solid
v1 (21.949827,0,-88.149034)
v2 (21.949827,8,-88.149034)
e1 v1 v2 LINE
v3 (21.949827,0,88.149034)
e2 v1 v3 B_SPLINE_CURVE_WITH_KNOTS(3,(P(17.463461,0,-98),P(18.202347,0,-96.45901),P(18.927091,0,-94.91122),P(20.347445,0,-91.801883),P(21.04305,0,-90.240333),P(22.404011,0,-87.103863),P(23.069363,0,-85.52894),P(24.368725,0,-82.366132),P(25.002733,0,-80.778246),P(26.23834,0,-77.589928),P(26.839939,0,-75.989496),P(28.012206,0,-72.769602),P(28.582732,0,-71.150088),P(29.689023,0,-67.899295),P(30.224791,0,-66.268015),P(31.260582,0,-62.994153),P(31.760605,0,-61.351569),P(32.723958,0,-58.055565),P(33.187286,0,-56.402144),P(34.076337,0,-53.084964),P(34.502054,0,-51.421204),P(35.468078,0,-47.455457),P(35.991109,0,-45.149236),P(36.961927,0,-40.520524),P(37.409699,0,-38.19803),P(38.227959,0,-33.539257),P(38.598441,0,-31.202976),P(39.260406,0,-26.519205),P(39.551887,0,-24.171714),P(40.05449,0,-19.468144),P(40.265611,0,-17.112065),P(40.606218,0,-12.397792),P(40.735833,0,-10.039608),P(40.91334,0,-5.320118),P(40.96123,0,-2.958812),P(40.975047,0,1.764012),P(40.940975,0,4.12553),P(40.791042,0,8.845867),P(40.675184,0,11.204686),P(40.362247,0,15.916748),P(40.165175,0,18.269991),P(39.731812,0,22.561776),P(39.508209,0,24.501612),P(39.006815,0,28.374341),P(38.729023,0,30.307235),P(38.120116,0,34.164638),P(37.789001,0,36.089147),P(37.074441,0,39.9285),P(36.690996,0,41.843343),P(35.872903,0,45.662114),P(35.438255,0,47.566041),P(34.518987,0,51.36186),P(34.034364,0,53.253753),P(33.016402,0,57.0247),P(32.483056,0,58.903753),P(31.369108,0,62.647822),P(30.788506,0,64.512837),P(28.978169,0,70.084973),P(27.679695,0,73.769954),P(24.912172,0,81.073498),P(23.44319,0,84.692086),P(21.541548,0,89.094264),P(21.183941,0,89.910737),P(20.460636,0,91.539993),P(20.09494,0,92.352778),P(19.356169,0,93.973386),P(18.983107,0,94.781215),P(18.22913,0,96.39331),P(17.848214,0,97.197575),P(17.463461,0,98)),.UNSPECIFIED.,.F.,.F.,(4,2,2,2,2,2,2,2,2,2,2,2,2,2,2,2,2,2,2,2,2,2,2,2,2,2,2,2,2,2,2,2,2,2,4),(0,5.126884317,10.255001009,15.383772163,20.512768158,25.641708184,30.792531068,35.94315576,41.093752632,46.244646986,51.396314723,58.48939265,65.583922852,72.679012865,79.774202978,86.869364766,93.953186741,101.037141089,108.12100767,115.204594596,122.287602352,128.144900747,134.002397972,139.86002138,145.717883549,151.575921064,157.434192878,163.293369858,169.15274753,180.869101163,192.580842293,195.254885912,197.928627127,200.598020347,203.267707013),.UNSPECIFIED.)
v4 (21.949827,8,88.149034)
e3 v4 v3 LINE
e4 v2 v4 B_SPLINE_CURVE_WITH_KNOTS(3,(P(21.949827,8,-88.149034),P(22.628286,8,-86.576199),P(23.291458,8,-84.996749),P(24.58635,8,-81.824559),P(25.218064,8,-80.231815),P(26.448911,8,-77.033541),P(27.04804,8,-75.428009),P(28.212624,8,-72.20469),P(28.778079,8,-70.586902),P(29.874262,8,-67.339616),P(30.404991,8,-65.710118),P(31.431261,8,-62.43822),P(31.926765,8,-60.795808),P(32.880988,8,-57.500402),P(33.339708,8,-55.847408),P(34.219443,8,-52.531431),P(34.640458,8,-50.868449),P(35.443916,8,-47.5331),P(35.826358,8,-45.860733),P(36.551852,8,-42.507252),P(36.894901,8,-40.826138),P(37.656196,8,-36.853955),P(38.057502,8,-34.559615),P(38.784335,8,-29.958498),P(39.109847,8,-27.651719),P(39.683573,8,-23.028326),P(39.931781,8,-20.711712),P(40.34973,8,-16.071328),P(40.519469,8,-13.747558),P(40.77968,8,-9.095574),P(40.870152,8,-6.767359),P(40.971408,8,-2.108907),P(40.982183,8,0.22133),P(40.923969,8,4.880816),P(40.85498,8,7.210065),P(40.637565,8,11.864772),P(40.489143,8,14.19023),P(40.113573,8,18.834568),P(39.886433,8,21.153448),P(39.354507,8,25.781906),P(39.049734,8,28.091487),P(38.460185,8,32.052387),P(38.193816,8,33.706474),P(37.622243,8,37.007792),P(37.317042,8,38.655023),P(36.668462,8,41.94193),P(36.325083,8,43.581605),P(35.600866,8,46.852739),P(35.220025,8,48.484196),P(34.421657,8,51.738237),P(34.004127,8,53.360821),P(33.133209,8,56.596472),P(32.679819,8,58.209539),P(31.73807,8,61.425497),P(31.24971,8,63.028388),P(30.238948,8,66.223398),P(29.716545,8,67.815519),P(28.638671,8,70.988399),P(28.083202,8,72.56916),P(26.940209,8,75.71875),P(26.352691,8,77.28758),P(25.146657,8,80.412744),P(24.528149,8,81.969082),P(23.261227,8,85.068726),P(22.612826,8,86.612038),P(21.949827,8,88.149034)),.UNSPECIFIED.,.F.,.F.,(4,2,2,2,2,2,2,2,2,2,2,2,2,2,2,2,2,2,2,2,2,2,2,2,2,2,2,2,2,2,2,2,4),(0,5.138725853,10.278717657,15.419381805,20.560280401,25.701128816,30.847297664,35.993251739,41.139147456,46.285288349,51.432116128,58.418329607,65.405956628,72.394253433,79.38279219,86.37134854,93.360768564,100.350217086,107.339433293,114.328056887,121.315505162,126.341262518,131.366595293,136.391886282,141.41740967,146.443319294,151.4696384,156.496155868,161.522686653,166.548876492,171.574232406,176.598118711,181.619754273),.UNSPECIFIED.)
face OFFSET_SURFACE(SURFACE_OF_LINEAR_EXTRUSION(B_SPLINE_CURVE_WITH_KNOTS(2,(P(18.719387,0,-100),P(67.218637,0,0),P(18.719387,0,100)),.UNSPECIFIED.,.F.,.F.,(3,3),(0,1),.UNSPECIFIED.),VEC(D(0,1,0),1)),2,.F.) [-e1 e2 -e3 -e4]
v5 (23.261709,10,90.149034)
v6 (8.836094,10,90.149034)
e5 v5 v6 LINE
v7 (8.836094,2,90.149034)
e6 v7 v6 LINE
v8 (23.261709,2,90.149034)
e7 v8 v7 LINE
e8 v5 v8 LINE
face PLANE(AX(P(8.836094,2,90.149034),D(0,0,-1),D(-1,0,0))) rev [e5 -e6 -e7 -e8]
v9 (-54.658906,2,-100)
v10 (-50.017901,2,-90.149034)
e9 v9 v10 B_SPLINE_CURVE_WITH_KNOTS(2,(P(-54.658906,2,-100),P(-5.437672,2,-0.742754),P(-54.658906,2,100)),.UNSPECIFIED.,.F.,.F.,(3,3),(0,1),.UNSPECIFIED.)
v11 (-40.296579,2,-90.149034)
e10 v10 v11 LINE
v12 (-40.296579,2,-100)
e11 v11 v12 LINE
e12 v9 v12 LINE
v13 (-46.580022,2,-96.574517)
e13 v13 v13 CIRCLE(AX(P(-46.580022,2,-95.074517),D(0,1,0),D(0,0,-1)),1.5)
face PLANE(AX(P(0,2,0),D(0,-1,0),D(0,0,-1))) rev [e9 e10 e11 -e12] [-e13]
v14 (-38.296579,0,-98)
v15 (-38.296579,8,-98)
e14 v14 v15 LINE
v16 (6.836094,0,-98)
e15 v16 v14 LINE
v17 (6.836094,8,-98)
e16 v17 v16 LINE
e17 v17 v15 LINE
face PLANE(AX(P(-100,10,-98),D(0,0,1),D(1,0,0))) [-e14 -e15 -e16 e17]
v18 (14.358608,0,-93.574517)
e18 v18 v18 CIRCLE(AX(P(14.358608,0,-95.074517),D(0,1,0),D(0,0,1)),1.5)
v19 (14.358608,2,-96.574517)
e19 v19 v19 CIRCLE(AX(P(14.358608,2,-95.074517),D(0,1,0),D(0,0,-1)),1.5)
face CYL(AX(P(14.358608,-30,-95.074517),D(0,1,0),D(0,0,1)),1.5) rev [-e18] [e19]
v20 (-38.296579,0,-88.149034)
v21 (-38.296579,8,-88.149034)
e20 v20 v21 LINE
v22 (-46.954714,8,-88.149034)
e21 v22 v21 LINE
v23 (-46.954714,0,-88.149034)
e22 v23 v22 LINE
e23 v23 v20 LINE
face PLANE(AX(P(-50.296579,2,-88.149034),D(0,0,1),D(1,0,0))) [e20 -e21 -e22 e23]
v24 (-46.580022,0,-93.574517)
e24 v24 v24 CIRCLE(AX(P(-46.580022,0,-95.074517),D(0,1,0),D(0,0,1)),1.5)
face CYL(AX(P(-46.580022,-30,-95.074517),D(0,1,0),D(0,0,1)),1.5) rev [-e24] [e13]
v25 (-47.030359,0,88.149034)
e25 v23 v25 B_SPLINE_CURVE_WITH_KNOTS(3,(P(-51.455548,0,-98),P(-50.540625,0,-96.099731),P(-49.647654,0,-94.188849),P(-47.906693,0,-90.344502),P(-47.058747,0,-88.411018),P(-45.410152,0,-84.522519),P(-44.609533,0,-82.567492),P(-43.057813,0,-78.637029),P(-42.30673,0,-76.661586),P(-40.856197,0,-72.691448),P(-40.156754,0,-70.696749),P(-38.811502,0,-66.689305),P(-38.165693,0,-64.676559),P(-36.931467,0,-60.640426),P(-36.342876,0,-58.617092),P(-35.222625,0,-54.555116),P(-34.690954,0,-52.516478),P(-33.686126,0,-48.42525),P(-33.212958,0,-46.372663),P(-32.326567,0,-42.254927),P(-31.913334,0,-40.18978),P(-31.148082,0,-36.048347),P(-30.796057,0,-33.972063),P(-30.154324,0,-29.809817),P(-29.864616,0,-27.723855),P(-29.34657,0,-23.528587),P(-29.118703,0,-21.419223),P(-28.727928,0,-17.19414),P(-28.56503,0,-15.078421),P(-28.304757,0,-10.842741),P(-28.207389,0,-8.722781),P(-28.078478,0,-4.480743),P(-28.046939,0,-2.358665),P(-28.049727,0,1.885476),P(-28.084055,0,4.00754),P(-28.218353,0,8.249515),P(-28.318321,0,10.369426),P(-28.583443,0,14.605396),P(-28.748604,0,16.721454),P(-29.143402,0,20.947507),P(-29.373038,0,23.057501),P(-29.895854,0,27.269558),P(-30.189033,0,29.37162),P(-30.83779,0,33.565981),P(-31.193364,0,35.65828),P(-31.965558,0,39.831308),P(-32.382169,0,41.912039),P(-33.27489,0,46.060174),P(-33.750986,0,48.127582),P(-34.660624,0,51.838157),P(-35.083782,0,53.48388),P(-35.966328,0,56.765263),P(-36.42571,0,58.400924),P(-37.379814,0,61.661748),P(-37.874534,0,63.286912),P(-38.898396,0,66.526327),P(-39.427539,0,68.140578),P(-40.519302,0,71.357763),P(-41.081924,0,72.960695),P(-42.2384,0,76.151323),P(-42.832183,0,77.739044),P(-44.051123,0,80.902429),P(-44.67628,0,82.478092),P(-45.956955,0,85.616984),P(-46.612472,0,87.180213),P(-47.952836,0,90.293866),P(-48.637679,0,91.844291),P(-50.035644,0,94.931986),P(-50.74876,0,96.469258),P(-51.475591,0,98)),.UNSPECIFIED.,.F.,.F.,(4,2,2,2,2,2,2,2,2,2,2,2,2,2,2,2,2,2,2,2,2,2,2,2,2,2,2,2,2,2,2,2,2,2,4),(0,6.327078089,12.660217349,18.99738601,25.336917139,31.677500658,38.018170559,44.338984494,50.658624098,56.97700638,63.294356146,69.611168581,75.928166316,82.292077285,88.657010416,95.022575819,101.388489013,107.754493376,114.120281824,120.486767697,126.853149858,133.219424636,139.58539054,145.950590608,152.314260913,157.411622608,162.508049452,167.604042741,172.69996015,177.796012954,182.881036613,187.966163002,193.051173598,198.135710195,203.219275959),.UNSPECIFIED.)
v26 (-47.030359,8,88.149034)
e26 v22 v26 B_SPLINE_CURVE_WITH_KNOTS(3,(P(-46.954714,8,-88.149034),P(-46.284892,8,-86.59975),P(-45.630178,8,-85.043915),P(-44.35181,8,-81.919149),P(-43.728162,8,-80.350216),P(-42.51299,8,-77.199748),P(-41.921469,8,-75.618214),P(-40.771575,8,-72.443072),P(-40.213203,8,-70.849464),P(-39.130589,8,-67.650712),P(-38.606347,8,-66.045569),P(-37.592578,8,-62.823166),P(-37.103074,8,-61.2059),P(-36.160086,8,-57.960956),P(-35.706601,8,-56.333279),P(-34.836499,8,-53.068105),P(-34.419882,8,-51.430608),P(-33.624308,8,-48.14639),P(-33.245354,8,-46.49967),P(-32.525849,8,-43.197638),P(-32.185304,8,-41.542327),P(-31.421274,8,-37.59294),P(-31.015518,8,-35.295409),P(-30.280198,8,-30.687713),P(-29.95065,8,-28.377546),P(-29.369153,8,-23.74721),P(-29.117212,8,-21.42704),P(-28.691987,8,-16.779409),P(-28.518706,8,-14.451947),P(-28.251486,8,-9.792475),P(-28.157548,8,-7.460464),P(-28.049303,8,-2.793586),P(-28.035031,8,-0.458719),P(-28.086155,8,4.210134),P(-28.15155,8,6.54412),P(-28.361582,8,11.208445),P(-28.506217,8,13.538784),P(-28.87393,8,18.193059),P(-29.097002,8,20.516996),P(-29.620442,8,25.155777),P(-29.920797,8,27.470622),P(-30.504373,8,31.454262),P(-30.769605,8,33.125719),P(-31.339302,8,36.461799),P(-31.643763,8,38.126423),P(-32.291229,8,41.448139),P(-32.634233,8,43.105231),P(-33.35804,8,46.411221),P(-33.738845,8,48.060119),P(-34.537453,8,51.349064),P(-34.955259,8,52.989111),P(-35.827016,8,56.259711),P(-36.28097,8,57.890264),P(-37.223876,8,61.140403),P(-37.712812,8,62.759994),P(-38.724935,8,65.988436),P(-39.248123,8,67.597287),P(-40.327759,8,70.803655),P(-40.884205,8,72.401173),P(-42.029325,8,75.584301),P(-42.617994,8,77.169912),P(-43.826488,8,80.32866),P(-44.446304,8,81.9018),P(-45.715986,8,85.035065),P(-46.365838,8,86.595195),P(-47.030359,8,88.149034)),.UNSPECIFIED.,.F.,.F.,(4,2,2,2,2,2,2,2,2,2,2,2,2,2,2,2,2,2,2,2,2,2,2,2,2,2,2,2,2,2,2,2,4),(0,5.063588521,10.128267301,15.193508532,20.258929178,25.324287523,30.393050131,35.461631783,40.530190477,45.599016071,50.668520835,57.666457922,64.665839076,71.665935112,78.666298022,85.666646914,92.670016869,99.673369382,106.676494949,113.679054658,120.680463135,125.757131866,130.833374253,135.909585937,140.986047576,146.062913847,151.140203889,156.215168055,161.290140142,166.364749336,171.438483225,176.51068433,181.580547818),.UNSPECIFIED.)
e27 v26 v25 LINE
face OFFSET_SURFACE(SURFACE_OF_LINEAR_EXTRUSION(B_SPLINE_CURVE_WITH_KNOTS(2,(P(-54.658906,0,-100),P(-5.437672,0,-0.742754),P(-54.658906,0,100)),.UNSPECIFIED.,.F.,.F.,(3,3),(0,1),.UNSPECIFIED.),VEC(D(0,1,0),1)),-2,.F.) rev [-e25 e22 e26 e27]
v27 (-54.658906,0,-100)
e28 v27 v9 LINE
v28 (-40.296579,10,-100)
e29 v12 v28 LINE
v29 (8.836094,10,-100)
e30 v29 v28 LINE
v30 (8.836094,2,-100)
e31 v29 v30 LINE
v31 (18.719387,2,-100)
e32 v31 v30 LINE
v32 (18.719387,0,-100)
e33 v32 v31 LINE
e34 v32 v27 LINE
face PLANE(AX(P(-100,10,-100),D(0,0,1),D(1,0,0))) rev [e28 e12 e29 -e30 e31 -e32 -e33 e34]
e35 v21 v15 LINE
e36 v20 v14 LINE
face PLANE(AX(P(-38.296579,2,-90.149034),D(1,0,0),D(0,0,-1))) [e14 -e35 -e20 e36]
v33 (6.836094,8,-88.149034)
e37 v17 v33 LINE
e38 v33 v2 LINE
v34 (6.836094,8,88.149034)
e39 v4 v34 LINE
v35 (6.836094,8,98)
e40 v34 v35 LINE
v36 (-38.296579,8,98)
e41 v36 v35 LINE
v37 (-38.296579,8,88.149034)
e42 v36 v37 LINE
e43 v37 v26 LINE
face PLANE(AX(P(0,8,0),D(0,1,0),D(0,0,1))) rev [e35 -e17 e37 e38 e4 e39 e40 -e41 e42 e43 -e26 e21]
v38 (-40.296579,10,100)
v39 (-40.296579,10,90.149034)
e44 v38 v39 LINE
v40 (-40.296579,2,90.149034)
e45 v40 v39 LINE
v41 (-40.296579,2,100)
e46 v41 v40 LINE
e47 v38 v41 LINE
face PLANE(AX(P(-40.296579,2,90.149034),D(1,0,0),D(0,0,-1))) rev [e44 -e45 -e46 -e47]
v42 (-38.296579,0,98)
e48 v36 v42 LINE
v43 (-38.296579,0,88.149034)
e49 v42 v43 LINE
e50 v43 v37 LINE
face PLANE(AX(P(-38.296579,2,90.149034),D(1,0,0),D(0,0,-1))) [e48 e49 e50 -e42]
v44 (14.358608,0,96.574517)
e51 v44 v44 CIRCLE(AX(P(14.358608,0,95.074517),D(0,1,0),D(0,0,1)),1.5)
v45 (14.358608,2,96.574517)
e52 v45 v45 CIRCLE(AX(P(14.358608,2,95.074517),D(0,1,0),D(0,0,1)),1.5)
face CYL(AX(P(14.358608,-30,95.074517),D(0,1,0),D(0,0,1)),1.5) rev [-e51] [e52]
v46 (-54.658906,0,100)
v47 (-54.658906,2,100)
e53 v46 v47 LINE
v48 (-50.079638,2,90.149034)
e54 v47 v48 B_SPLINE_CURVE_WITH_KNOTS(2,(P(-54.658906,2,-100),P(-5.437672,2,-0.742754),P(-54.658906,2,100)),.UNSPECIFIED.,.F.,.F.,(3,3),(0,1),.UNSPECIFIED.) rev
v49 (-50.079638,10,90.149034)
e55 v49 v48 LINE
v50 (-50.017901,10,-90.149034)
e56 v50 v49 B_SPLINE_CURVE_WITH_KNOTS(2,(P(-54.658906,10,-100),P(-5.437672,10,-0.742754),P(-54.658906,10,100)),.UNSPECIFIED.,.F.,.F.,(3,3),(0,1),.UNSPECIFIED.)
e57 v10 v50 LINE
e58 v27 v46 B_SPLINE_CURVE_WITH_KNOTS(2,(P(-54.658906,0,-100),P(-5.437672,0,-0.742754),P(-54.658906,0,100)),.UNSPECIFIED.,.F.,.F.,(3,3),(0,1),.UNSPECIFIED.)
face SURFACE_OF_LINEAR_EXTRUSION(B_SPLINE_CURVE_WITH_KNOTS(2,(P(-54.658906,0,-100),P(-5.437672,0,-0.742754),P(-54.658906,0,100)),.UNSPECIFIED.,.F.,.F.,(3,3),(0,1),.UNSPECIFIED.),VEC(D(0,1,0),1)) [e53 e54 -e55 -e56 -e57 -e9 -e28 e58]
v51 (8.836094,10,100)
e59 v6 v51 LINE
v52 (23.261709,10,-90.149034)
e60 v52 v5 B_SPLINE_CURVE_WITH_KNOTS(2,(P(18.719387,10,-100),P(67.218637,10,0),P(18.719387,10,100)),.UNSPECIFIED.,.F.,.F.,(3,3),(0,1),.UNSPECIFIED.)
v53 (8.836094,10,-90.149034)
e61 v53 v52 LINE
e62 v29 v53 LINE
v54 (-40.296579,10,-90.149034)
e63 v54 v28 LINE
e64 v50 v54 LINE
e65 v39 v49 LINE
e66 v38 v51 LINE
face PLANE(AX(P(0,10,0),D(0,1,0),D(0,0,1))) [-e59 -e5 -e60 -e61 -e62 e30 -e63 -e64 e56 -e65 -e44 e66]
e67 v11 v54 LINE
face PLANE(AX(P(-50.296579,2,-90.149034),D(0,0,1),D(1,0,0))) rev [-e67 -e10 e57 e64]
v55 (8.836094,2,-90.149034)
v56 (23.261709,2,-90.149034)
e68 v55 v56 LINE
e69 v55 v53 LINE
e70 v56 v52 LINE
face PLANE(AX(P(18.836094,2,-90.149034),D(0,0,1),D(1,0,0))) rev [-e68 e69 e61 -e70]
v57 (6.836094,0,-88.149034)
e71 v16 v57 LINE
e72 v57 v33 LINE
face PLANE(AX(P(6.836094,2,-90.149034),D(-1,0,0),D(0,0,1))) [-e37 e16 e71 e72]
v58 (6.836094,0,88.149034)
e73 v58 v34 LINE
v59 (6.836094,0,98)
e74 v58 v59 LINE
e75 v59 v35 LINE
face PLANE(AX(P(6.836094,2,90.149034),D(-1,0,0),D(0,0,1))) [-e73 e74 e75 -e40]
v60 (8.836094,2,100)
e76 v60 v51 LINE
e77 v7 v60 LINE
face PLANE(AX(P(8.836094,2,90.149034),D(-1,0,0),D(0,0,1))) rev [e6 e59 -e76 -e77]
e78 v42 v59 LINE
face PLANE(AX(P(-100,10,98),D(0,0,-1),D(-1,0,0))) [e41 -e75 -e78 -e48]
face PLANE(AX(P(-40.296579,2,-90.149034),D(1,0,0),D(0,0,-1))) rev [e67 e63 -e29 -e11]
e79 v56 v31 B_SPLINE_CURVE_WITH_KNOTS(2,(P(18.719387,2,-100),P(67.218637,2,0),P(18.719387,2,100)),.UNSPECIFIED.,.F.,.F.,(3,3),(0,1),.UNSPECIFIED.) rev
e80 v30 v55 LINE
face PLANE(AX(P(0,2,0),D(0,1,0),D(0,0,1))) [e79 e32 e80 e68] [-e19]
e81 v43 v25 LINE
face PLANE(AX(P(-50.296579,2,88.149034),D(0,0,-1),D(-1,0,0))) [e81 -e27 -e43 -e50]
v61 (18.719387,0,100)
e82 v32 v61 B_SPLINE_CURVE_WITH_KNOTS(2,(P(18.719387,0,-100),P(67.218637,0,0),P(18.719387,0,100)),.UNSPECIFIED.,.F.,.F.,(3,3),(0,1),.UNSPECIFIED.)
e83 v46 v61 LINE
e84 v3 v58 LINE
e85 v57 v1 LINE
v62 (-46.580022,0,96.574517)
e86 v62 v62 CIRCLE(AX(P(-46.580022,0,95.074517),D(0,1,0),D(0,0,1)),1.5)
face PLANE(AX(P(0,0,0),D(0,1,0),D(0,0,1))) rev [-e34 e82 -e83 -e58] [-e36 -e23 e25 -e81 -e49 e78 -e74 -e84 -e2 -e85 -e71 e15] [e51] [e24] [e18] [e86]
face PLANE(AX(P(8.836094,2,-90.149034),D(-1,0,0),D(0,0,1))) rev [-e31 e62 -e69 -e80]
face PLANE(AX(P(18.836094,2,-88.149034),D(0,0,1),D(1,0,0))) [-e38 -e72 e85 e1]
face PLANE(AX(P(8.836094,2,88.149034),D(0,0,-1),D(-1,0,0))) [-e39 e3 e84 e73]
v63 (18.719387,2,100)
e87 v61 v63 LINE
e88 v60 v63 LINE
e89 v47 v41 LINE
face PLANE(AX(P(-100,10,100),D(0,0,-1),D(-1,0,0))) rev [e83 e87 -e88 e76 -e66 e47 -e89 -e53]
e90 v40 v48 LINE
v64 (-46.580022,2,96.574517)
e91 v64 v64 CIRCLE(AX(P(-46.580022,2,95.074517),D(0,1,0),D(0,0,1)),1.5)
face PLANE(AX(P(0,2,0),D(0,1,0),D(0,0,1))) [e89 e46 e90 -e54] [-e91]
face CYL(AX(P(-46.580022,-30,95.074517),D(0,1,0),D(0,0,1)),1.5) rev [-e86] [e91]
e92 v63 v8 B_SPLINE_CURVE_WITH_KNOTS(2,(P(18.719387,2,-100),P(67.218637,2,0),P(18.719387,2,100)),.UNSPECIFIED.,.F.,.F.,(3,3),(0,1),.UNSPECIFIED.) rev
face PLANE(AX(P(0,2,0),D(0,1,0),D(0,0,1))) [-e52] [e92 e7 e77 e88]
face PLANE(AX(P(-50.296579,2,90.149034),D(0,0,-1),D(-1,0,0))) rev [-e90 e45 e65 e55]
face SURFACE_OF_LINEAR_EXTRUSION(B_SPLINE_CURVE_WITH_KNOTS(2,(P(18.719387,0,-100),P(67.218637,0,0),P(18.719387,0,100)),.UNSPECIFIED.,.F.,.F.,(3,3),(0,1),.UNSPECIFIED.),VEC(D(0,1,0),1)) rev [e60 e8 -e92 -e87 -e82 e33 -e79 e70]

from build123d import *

# Parameters (mm, degrees)
CROQUIS1_W              = 200
CROQUIS1_H              = 200
SALIENTE_EXTRUIR1_DEPTH = 10
CORTAR_EXTRUIR2_DEPTH   = 10
CORTAR_EXTRUIR3_DEPTH   = 8
CROQUIS6_R              = 1.5
CORTAR_EXTRUIR4_DEPTH   = 32
VACIADO1_DEPTH          = 8


# Read off the part's stored shape, not the designer's step: Vaciado1
with BuildPart() as part:
    # Croquis1 → Saliente-Extruir1 (new body)
    with BuildSketch(Plane(origin=(0, 0, 0), x_dir=(1, 0, 0), z_dir=(0, 1, 0))):
        Rectangle(CROQUIS1_W, CROQUIS1_H)
    extrude(amount=SALIENTE_EXTRUIR1_DEPTH)

    # Croquis3 → Cortar-Extruir2 (cut)
    with BuildSketch(Plane(origin=(0, 10, 0), x_dir=(1, 0, 0), z_dir=(0, 1, 0))):
        with BuildLine():
            add(Edge.make_bspline(
                [(-54.658905902, 100), (-5.437672215, 0.742753657), (-54.658905902, -100)],
                knots=[0, 0, 0, 1, 1, 1], degree=2))
            Line((-54.658905902, 100), (-100, 100))
            Line((-100, 100), (-100, -100))
            Line((-100, -100), (-54.658905902, -100))
        make_face()
        with BuildLine():
            Line((100, 100), (18.719386755, 100))
            add(Edge.make_bspline(
                [(18.719386755, 100), (67.218637457, 0), (18.719386755, -100)],
                knots=[0, 0, 0, 1, 1, 1], degree=2))
            Line((18.719386755, -100), (100, -100))
            Line((100, -100), (100, 100))
        make_face()
    extrude(amount=-CORTAR_EXTRUIR2_DEPTH, mode=Mode.SUBTRACT)

    # Croquis4 → Cortar-Extruir3 (cut)
    with BuildSketch(Plane(origin=(0, 10, 0), x_dir=(1, 0, 0), z_dir=(0, 1, 0))):
        Polygon((-50.296578731, -90.149033959), (-40.296578731, -90.149033959), (-40.296578731, -100.149033959), (-50.296578731, -100.149033959), (-58.120283929, -100.149033959), align=None)
        Polygon((8.836094338, -90.149033959), (18.836094338, -90.149033959), (23.704036403, -90.149033959), (18.836094338, -100.149033959), (8.836094338, -100.149033959), align=None)
        Polygon((8.836094338, 90.149033959), (8.836094338, 100.149033959), (18.836094338, 100.149033959), (23.704036403, 90.149033959), (18.836094338, 90.149033959), align=None)
        Polygon((-58.120283929, 100.149033959), (-50.296578731, 90.149033959), (-40.296578731, 90.149033959), (-40.296578731, 100.149033959), (-50.296578731, 100.149033959), align=None)
    extrude(amount=-CORTAR_EXTRUIR3_DEPTH, mode=Mode.SUBTRACT)

    # Croquis6 → Cortar-Extruir4 (cut)
    with BuildSketch(Plane(origin=(0, 2, 0), x_dir=(1, 0, 0), z_dir=(0, 1, 0))):
        with Locations(Location((-46.580021795, -95.07451698, 0), (0, 0, 270))):
            Circle(CROQUIS6_R)
        with Locations(Location((14.358607989, -95.07451698, 0), (0, 0, 270))):
            Circle(CROQUIS6_R)
        with Locations(Location((14.358607989, 95.07451698, 0), (0, 0, 270))):
            Circle(CROQUIS6_R)
        with Locations(Location((-46.580021795, 95.07451698, 0), (0, 0, 270))):
            Circle(CROQUIS6_R)
    extrude(amount=-CORTAR_EXTRUIR4_DEPTH, mode=Mode.SUBTRACT)

    # Vaciado1 outline → Vaciado1 (cut)
    with BuildSketch(Plane(origin=(0, 0, 0), x_dir=(1, 0, 0), z_dir=(0, 1, 0))):
        with BuildLine():
            Line((-38.296578731, 88.149033959), (-46.954714444, 88.14903419))
            add(Edge.make_bspline(
                [(-46.954714444, 88.14903419), (-39.391707249, 70.655852329), (-33.505222898, 53.123612665), (-29.298629275, 35.553220346), (-26.77560099, 17.947129894), (-25.939405083, 0.309621467), (-26.791931975, -17.352344743), (-29.330747185, -35.032202144), (-33.552462911, -52.726080621), (-39.453418895, -70.431901676), (-47.030358691, -88.149034179)],
                knots=[0.063666004, 0.063666004, 0.063666004, 0.063666004, 0.063666004, 0.063666004, 0.063666004, 0.063666004, 0.063666004, 0.063666004, 0.063666004, 0.937249877, 0.937249877, 0.937249877, 0.937249877, 0.937249877, 0.937249877, 0.937249877, 0.937249877, 0.937249877, 0.937249877, 0.937249877], degree=10))
            Line((-47.030358691, -88.149034179), (-38.296578731, -88.149033959))
            Line((-38.296578731, -88.149033959), (-38.296578731, -98))
            Line((-38.296578731, -98), (6.836094338, -98))
            Line((6.836094338, -98), (6.836094338, -88.149033959))
            Line((6.836094338, -88.149033959), (21.949825856, -88.149033757))
            add(Edge.make_bspline(
                [(21.949825856, 88.149033757), (30.411471368, 68.532743192), (36.750179646, 48.933917862), (40.970725224, 29.351479613), (43.07830794, 9.781812592), (43.07830794, -9.781812592), (40.970725224, -29.351479613), (36.750179646, -48.933917862), (30.411471368, -68.532743192), (21.949825856, -88.149033757)],
                knots=[0.055294031, 0.055294031, 0.055294031, 0.055294031, 0.055294031, 0.055294031, 0.055294031, 0.055294031, 0.055294031, 0.055294031, 0.944705969, 0.944705969, 0.944705969, 0.944705969, 0.944705969, 0.944705969, 0.944705969, 0.944705969, 0.944705969, 0.944705969], degree=9))
            Line((21.949825856, 88.149033757), (6.836094338, 88.149033959))
            Line((6.836094338, 88.149033959), (6.836094338, 98))
            Line((6.836094338, 98), (-38.296578731, 98))
            Line((-38.296578731, 98), (-38.296578731, 88.149033959))
        make_face()
    extrude(amount=VACIADO1_DEPTH, mode=Mode.SUBTRACT)


solid = part.part
